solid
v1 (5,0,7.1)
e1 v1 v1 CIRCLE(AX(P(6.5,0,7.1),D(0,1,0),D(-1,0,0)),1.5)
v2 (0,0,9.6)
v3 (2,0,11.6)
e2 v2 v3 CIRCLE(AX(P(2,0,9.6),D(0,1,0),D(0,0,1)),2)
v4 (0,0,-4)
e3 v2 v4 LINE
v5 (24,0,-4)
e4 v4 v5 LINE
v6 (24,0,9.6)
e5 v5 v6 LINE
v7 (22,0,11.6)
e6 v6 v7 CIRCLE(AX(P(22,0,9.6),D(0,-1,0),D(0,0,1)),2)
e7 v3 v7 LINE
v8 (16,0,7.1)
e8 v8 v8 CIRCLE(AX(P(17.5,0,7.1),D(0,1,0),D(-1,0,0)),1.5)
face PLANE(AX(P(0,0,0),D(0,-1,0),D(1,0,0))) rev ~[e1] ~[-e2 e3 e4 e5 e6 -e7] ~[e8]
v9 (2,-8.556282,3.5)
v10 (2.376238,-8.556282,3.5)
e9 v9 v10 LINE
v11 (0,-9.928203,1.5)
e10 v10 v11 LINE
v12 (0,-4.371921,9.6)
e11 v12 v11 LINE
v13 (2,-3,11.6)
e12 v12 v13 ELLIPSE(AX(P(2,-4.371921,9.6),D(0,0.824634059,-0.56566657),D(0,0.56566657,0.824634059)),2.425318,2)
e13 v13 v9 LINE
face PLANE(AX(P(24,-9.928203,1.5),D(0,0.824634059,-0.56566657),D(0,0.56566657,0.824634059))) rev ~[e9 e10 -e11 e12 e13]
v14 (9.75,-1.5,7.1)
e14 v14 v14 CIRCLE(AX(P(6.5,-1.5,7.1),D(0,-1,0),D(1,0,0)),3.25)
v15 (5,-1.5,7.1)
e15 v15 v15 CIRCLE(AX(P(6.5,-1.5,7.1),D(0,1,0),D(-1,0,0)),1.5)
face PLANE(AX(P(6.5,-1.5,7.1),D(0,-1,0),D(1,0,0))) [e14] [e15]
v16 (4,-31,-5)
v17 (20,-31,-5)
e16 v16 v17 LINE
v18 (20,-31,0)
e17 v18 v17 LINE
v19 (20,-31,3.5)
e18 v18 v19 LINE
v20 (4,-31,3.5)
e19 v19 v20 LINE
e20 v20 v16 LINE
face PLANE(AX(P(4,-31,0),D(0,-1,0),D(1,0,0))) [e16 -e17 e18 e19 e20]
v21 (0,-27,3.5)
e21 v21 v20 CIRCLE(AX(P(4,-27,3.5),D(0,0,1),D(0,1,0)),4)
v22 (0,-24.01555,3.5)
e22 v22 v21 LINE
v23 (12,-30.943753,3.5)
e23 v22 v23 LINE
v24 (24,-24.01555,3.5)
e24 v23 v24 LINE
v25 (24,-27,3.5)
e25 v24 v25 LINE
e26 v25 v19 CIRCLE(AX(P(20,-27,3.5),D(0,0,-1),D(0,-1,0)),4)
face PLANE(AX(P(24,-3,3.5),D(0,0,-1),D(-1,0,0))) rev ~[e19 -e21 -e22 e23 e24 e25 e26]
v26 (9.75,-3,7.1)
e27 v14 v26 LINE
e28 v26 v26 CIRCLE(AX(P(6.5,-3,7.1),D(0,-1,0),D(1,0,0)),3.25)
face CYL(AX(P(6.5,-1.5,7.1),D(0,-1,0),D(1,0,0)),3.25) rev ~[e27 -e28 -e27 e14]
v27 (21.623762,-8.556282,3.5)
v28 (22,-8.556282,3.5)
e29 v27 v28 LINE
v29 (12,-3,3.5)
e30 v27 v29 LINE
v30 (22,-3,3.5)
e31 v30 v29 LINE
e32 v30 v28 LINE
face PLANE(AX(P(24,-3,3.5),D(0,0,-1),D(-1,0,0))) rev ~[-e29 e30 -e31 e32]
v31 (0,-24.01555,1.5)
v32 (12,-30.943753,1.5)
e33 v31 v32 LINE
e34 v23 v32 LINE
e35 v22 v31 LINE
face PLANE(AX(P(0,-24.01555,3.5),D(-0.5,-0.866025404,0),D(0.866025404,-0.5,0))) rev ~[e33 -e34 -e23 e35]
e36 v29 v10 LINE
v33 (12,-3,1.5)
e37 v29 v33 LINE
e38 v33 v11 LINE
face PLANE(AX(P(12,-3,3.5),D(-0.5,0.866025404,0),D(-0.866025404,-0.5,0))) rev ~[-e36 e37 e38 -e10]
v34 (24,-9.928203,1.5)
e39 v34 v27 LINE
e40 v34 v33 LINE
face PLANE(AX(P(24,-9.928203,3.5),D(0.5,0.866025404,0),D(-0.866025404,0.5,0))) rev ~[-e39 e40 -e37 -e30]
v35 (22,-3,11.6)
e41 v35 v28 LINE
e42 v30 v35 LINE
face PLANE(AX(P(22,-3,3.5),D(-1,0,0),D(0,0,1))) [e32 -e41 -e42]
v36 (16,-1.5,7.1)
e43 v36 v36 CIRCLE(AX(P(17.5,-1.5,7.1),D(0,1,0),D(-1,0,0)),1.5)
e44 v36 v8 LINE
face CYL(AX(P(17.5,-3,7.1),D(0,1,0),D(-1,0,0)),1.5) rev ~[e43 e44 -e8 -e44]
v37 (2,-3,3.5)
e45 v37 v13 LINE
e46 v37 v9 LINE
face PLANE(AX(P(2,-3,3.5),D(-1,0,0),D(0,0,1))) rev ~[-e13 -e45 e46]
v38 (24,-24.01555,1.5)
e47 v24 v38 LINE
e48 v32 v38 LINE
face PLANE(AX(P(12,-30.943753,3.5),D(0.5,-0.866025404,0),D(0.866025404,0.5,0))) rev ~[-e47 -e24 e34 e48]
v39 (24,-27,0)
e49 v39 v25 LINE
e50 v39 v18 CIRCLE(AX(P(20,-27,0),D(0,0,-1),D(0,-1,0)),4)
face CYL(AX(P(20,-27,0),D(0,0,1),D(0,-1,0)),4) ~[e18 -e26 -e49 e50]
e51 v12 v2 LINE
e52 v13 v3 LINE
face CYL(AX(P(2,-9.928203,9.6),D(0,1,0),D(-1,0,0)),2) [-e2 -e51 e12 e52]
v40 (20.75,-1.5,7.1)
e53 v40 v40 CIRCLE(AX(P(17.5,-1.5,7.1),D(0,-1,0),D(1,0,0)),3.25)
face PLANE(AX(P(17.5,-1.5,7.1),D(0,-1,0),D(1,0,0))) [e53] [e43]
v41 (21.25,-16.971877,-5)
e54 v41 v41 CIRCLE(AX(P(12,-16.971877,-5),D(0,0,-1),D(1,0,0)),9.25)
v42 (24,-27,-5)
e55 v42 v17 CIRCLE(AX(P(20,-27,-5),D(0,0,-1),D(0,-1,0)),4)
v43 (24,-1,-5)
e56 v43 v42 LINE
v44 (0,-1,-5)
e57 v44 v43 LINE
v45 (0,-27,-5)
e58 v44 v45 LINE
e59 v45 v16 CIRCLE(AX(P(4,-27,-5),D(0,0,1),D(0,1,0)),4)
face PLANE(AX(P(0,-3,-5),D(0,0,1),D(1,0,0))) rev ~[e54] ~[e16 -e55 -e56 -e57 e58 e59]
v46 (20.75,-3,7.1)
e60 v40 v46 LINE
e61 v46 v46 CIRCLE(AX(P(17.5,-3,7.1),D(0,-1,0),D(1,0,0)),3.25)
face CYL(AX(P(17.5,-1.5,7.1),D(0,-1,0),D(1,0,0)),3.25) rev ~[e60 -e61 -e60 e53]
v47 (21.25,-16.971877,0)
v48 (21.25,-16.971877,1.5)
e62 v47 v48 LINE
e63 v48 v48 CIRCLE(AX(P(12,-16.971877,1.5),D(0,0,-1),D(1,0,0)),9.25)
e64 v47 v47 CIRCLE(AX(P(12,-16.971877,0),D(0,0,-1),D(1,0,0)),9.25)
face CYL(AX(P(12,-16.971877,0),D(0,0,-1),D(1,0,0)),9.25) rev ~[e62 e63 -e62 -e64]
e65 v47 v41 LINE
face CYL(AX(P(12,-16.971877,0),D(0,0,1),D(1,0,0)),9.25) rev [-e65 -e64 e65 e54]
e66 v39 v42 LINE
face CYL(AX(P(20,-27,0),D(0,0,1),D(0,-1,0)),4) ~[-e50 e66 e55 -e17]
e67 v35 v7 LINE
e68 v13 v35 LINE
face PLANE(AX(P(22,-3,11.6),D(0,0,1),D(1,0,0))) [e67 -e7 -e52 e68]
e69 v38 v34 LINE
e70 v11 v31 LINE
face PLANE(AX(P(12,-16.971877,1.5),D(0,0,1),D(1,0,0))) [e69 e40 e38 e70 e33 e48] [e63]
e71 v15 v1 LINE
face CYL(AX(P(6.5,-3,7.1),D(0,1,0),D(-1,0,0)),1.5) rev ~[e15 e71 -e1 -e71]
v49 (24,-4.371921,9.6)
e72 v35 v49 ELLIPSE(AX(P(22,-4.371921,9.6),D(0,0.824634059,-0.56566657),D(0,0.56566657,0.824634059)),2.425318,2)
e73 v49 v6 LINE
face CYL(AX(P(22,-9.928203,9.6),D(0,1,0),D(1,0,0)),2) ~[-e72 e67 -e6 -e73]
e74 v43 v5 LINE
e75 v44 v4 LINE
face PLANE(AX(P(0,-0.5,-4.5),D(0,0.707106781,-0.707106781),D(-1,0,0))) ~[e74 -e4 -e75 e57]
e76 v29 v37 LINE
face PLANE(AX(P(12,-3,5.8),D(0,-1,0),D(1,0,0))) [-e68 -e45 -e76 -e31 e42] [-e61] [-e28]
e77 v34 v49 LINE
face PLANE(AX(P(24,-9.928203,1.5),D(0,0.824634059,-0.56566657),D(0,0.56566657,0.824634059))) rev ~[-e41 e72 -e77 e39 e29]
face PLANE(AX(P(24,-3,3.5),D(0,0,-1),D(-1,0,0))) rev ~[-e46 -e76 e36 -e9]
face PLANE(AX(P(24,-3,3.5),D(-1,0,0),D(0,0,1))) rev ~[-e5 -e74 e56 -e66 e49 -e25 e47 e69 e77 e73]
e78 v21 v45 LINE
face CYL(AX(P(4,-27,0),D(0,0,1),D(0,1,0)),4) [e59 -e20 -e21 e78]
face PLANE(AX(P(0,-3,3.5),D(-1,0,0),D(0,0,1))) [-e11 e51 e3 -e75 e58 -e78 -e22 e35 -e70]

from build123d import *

# Parameters (mm, degrees)
F0_W           = 24
F0_H           = 11.6
F1_DEPTH       = 3
F3_D           = 3
F3_CBORE_D     = 6.5
F3_CBORE_DEPTH = 1.5
F4_DEPTH       = 28
F7_R           = 4
F8_R           = 9.25
F9_DEPTH       = 25
F10_DEPTH      = 5
F11_DEPTH      = 2
F2_W           = 2
F2_H           = 8.1
F12_REACH      = 36.3442607534
F5_W           = 2
F5_H           = 8.1
F13_REACH      = 36.3442607534
F14_SIZE       = 1
F15_R          = 2
F17_DEPTH      = 25


# Not quite as in the source:
# - a feature names something its author has since deleted; it is built from what else it names


with BuildPart() as f1:
    # F0 (on Front) → F1 (new body)
    with BuildSketch(Plane.XZ):
        with Locations((12, 5.8)):
            Rectangle(F0_W, F0_H)
    extrude(amount=F1_DEPTH)

    # F3 (through all)
    with Locations(Plane.XZ.offset(3)):
        with Locations((6.5, 7.1), (17.5, 7.1)):
            CounterBoreHole(F3_D / 2, F3_CBORE_D / 2, F3_CBORE_DEPTH)

    # F2 (on face) → F4 (join)
    with BuildSketch(Plane.XZ.offset(3)):
        Polygon((0, 3.5), (0, 0), (24, 0), (24, 3.5), (22, 3.5), (2, 3.5), align=None)
    extrude(amount=F4_DEPTH)

    # F7
    f7_edges = [f1.edges().sort_by_distance(p)[0] for p in [
        (24, -31, 1.75),
        (0, -31, 1.75),
    ]]
    fillet(f7_edges, radius=F7_R)

    # F8 (on face) → F9 (cut)
    with BuildSketch(Plane(origin=(0, 0, 0), x_dir=(1, 0, 0), z_dir=(0, 0, -1))):
        with Locations((12, 16.9718765144)):
            Circle(F8_R)
    extrude(amount=-F9_DEPTH, mode=Mode.SUBTRACT)

    # F10 (add): a face of the model
    f10_faces = [f1.faces().sort_by_distance(p)[0] for p in [
        (0.3920459157, -13.5, 0),
    ]]
    extrude(f10_faces, amount=F10_DEPTH)

    # F6 (on face) → F11 (cut)
    with BuildSketch(Plane.XY.offset(3.5)):
        Polygon((24, -24.0155497985), (24, -9.9282032303), (12, -3), (0, -9.9282032303), (0, -24.0155497985), (12, -30.9437530288), align=None)
    extrude(amount=-F11_DEPTH, mode=Mode.SUBTRACT)

    f12_end = Plane(origin=(6, -6.4641016151, 2.5), x_dir=(-0.8660254038, -0.5, 0), z_dir=(0.5, -0.8660254038, 0))
    # F2 (on face) → F12 (join, up to a plane its end follows)
    with BuildSketch(Plane.XZ.offset(3)):
        with Locations((1, 7.55)):
            Rectangle(F2_W, F2_H)
    f12_long = extrude(amount=F12_REACH, mode=Mode.PRIVATE)
    add(split(f12_long, bisect_by=f12_end, keep=Keep.BOTTOM, mode=Mode.PRIVATE))

    f13_end = Plane(origin=(18, -6.4641016151, 2.5), x_dir=(-0.8660254038, 0.5, 0), z_dir=(-0.5, -0.8660254038, 0))
    # F5 (on face) → F13 (join, up to a plane its end follows)
    with BuildSketch(Plane.XZ.offset(3)):
        with Locations((23, 7.55)):
            Rectangle(F5_W, F5_H)
    f13_long = extrude(amount=F13_REACH, mode=Mode.PRIVATE)
    add(split(f13_long, bisect_by=f13_end, keep=Keep.BOTTOM, mode=Mode.PRIVATE))

    # F14
    f14_edges = [f1.edges().sort_by_distance(p)[0] for p in [
        (12, 0, -5),
    ]]
    chamfer(f14_edges, length=F14_SIZE)

    # F15
    f15_edges = [f1.edges().sort_by_distance(p)[0] for p in [
        (24, -4.964102, 11.6),
        (0, -4.964102, 11.6),
    ]]
    fillet(f15_edges, radius=F15_R)

    # F16 (on face) → F17 (cut)
    with BuildSketch(Plane.YZ.offset(24)):
        Polygon((-9.9282032303, 11.6), (-9.9282032303, 1.5), (-3, 11.6), align=None)
    extrude(amount=-F17_DEPTH, mode=Mode.SUBTRACT)


solid = f1.part
